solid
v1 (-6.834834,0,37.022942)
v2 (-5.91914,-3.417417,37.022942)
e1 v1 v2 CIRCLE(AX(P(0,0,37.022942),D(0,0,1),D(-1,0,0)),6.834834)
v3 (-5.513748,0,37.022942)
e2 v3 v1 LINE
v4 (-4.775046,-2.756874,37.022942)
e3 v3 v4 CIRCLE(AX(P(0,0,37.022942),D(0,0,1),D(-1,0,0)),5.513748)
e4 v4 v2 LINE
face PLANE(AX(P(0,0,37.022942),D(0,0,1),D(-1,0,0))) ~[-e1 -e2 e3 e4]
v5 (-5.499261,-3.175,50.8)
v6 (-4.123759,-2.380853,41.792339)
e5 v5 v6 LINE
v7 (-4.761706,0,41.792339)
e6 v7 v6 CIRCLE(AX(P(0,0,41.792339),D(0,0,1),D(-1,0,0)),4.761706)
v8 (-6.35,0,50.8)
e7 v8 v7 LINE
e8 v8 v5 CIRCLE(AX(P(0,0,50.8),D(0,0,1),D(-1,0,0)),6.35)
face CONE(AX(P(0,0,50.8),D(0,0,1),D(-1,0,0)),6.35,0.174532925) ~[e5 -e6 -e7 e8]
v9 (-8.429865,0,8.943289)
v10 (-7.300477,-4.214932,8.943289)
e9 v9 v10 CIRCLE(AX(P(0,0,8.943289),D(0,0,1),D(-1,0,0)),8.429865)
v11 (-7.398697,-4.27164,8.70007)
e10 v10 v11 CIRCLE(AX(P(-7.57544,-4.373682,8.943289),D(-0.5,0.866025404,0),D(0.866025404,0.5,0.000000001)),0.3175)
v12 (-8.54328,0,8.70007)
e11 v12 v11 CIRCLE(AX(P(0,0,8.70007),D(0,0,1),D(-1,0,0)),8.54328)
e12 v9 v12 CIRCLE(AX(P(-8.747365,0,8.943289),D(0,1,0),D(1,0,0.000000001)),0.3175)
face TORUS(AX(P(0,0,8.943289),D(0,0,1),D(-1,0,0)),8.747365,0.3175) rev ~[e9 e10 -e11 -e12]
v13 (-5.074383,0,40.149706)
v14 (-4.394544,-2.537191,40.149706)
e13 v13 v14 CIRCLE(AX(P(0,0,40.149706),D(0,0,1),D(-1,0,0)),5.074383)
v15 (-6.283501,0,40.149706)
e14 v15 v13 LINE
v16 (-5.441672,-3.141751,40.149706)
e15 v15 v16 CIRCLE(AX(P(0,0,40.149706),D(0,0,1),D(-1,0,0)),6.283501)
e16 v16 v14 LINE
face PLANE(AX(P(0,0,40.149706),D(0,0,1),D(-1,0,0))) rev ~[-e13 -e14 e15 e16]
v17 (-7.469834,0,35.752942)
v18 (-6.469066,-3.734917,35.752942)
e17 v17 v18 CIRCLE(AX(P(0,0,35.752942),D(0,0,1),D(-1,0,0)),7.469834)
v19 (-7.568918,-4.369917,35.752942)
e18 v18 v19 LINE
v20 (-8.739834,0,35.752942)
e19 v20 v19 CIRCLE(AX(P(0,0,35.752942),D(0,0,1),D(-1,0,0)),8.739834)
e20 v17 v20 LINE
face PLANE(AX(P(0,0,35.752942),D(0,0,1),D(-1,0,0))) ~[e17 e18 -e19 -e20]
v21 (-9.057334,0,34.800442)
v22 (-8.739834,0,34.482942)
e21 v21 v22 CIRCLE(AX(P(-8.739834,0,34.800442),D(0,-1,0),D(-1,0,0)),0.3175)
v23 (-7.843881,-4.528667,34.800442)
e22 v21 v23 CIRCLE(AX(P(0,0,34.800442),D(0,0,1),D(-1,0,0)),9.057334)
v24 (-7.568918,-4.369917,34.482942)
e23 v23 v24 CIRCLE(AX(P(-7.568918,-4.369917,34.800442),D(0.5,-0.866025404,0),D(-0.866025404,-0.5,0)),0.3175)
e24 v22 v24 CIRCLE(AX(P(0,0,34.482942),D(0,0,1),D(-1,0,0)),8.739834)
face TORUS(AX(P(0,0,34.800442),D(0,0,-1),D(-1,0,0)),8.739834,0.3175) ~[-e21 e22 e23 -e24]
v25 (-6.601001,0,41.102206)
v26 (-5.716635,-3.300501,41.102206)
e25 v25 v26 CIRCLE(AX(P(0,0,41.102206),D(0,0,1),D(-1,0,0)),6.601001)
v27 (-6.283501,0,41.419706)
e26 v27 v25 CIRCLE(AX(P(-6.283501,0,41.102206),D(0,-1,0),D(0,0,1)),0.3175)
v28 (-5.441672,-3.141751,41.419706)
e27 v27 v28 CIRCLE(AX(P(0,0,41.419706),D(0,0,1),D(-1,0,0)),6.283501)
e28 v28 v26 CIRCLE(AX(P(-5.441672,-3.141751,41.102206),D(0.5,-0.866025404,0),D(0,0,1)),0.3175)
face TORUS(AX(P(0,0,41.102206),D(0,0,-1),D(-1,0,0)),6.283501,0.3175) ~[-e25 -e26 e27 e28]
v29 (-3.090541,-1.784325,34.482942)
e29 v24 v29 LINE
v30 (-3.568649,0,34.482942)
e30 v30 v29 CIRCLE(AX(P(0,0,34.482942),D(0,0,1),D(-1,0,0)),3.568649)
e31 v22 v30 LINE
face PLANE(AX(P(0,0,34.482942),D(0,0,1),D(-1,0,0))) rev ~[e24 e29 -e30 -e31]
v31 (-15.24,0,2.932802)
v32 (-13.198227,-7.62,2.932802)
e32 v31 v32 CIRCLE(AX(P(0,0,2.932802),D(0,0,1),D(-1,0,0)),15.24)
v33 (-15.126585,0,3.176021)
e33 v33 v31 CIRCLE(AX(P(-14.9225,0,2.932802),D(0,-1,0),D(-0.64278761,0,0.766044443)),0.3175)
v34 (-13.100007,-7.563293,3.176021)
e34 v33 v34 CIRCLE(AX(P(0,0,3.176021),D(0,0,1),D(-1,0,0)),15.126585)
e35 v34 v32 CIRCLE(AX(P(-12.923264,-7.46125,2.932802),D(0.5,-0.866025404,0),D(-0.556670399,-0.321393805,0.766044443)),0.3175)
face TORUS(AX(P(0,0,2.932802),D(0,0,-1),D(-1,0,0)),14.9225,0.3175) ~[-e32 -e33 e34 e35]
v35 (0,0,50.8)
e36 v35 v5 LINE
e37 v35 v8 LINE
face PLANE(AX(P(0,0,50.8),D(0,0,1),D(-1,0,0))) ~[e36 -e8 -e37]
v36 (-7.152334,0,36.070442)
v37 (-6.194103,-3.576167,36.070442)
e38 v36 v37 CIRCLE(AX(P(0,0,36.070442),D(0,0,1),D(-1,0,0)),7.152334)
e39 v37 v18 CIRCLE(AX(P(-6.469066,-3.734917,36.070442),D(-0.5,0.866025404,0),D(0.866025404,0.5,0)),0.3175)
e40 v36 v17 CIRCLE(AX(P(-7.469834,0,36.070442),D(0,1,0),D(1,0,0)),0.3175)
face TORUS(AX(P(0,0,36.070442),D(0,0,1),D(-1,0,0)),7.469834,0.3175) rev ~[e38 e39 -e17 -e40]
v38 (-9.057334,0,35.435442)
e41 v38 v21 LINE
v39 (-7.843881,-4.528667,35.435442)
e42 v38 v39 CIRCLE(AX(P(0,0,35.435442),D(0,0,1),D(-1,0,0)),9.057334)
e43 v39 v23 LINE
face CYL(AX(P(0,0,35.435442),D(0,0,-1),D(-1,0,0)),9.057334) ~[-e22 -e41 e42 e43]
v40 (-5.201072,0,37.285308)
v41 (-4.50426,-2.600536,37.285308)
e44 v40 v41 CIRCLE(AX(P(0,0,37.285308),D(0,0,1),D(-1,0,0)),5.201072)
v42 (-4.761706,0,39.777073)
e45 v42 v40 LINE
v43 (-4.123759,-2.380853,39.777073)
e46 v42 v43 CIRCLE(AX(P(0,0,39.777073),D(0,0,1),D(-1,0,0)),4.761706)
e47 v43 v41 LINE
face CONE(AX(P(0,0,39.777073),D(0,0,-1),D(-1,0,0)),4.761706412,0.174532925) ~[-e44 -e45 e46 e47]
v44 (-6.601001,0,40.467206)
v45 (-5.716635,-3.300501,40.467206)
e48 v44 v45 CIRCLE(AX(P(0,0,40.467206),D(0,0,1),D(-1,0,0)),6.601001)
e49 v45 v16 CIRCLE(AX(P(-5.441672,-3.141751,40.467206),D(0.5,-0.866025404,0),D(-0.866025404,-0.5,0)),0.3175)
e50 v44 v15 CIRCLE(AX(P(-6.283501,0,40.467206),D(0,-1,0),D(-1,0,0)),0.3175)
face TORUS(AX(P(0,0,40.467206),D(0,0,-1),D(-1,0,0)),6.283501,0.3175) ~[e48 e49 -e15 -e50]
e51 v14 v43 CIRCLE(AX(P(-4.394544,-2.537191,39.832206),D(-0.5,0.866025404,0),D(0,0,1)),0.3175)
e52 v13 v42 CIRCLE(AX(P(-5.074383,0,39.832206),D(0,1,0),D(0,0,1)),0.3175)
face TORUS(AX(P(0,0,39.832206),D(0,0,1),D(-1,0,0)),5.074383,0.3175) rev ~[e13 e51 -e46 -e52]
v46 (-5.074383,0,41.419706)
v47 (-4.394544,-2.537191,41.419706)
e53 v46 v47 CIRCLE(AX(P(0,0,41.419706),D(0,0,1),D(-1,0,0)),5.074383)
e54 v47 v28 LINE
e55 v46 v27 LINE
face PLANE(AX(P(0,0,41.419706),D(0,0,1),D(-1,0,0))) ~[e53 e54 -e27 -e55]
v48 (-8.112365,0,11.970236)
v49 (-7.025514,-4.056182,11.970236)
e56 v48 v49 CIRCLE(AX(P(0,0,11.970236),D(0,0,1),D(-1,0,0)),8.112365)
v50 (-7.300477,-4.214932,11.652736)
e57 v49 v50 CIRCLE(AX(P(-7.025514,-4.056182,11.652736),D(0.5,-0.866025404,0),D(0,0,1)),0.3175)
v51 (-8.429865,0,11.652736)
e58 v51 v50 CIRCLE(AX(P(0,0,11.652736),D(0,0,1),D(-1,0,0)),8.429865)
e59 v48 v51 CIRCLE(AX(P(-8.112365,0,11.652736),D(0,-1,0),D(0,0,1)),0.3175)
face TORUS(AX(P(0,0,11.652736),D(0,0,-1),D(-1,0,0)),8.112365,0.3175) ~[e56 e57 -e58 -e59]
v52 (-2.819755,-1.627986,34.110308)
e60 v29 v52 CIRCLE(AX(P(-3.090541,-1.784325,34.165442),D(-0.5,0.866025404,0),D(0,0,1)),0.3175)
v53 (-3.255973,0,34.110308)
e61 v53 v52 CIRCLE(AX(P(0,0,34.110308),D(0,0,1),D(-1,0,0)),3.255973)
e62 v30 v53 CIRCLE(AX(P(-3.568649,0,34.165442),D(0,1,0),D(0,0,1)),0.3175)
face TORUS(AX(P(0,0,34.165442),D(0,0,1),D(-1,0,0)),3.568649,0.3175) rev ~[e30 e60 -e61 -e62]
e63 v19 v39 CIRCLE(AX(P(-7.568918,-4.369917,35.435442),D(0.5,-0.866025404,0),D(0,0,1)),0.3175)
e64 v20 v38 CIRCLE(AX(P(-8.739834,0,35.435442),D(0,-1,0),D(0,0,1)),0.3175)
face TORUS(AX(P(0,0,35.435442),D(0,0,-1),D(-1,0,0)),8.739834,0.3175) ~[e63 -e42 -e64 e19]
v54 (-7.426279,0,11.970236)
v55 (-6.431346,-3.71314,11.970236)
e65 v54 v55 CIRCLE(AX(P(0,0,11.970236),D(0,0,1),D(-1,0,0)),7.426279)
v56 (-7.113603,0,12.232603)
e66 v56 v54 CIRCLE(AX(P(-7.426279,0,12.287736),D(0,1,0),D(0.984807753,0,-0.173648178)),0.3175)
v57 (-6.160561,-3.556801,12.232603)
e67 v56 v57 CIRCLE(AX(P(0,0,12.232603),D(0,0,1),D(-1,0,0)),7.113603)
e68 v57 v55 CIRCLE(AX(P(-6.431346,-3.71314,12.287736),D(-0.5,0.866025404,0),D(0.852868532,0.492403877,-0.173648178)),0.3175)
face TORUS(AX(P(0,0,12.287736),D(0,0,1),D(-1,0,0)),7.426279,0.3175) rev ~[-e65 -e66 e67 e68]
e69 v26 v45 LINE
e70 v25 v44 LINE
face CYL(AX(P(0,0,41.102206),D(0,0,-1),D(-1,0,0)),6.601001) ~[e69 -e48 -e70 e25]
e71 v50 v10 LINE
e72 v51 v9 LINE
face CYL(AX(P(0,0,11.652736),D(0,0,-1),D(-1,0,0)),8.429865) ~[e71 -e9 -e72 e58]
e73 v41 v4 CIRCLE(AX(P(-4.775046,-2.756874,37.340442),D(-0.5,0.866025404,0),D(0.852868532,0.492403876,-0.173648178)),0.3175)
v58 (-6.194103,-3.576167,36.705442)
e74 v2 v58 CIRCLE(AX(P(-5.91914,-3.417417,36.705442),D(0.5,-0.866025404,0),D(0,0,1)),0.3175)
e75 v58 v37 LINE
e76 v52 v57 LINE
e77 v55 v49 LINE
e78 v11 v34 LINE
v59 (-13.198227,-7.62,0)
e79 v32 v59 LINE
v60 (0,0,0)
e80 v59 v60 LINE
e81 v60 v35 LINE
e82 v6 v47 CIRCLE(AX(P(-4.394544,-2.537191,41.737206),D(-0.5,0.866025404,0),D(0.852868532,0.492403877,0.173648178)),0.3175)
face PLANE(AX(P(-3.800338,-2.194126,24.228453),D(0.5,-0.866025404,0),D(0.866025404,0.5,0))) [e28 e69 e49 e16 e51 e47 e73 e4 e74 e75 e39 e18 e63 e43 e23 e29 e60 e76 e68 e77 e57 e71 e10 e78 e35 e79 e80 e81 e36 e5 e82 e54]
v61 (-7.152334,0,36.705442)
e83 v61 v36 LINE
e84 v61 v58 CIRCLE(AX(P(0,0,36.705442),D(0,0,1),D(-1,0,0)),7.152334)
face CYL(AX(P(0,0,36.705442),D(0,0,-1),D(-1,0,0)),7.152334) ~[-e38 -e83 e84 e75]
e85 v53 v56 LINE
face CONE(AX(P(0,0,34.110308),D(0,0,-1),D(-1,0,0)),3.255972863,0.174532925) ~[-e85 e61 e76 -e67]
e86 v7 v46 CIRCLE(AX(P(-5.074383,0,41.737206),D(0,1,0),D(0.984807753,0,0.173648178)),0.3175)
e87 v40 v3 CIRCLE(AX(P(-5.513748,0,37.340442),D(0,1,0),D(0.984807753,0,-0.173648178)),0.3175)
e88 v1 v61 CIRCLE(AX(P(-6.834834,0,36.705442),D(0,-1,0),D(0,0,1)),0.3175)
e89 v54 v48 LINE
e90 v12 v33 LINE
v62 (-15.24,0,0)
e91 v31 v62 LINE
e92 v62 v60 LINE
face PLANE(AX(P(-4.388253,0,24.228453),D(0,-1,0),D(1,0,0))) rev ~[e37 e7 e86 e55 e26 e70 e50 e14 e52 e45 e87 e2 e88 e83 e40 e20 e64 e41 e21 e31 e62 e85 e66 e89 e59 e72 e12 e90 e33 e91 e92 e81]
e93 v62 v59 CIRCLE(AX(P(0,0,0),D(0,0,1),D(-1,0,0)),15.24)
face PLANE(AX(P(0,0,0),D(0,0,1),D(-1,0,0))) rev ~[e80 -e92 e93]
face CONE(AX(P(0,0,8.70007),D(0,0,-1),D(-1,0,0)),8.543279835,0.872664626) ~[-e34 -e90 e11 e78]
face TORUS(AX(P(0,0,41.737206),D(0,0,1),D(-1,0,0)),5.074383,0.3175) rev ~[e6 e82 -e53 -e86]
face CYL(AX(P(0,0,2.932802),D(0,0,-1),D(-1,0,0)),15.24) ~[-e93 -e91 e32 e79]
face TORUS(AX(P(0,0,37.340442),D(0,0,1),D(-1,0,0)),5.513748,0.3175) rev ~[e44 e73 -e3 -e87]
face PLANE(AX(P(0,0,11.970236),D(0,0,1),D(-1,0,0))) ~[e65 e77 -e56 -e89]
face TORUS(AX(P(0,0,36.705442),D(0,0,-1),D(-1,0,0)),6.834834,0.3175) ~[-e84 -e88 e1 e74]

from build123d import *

# Parameters (mm, degrees)
F1_ANGLE = 30


# Not quite as in the source:
# - a feature of the source that left no trace in its solid (it failed there, or was rolled back) is left out


with BuildPart() as f1:
    # F0 (on Front) → F1 (revolve)
    with BuildSketch(Plane.XZ):
        with BuildLine():
            Line((-15.24, 0), (0, 0))
            Line((0, 0), (0, 50.8))
            Line((0, 50.8), (-6.35, 50.8))
            Line((-6.35, 50.8), (-4.7617064118, 41.792339449))
            ThreePointArc((-4.7617064118, 41.792339449), (-4.8311637627, 41.5331210865), (-5.0743828734, 41.4197061526))
            Line((-5.0743828734, 41.4197061526), (-6.2835011077, 41.4197061526))
            ThreePointArc((-6.2835011077, 41.4197061526), (-6.5080075107, 41.3267125556), (-6.6010011077, 41.1022061526))
            Line((-6.6010011077, 41.1022061526), (-6.6010011077, 40.4672061526))
            ThreePointArc((-6.6010011077, 40.4672061526), (-6.5080075107, 40.2426997495), (-6.2835011077, 40.1497061526))
            Line((-6.2835011077, 40.1497061526), (-5.0743828734, 40.1497061526))
            ThreePointArc((-5.0743828734, 40.1497061526), (-4.8311637627, 40.0362912186), (-4.7617064118, 39.7770728561))
            Line((-4.7617064118, 39.7770728561), (-5.2010717431, 37.2853082403))
            ThreePointArc((-5.2010717431, 37.2853082403), (-5.3096631386, 37.0972224261), (-5.5137482047, 37.0229415367))
            Line((-5.5137482047, 37.0229415367), (-6.8348340718, 37.0229415367))
            ThreePointArc((-6.8348340718, 37.0229415367), (-7.0593404748, 36.9299479398), (-7.1523340718, 36.7054415367))
            Line((-7.1523340718, 36.7054415367), (-7.1523340718, 36.0704415367))
            ThreePointArc((-7.1523340718, 36.0704415367), (-7.2453276688, 35.8459351337), (-7.4698340718, 35.7529415367))
            Line((-7.4698340718, 35.7529415367), (-8.7398340718, 35.7529415367))
            ThreePointArc((-8.7398340718, 35.7529415367), (-8.9643404748, 35.6599479398), (-9.0573340718, 35.4354415367))
            Line((-9.0573340718, 35.4354415367), (-9.0573340718, 34.8004415367))
            ThreePointArc((-9.0573340718, 34.8004415367), (-8.9643404748, 34.5759351337), (-8.7398340718, 34.4829415367))
            Line((-8.7398340718, 34.4829415367), (-3.5686493249, 34.4829415367))
            ThreePointArc((-3.5686493249, 34.4829415367), (-3.3254302142, 34.3695266028), (-3.2559728633, 34.1103082403))
            Line((-3.2559728633, 34.1103082403), (-7.113602572, 12.2326030065))
            ThreePointArc((-7.113602572, 12.2326030065), (-7.2221939675, 12.0445171922), (-7.4262790336, 11.9702363029))
            Line((-7.4262790336, 11.9702363029), (-8.1123649007, 11.9702363029))
            ThreePointArc((-8.1123649007, 11.9702363029), (-8.3368713037, 11.8772427059), (-8.4298649007, 11.6527363029))
            Line((-8.4298649007, 11.6527363029), (-8.4298649007, 8.9432889844))
            ThreePointArc((-8.4298649007, 8.9432889844), (-8.4596121783, 8.8091076862), (-8.5432798346, 8.7000698737))
            Line((-8.5432798346, 8.7000698737), (-15.1265850661, 3.176020882))
            ThreePointArc((-15.1265850661, 3.176020882), (-15.2102527224, 3.0669830694), (-15.24, 2.9328017713))
            Line((-15.24, 2.9328017713), (-15.24, 0))
        make_face()
    revolve(axis=Axis((0, 0, 25.4), (0, 0, 1)), revolution_arc=F1_ANGLE)


solid = f1.part
